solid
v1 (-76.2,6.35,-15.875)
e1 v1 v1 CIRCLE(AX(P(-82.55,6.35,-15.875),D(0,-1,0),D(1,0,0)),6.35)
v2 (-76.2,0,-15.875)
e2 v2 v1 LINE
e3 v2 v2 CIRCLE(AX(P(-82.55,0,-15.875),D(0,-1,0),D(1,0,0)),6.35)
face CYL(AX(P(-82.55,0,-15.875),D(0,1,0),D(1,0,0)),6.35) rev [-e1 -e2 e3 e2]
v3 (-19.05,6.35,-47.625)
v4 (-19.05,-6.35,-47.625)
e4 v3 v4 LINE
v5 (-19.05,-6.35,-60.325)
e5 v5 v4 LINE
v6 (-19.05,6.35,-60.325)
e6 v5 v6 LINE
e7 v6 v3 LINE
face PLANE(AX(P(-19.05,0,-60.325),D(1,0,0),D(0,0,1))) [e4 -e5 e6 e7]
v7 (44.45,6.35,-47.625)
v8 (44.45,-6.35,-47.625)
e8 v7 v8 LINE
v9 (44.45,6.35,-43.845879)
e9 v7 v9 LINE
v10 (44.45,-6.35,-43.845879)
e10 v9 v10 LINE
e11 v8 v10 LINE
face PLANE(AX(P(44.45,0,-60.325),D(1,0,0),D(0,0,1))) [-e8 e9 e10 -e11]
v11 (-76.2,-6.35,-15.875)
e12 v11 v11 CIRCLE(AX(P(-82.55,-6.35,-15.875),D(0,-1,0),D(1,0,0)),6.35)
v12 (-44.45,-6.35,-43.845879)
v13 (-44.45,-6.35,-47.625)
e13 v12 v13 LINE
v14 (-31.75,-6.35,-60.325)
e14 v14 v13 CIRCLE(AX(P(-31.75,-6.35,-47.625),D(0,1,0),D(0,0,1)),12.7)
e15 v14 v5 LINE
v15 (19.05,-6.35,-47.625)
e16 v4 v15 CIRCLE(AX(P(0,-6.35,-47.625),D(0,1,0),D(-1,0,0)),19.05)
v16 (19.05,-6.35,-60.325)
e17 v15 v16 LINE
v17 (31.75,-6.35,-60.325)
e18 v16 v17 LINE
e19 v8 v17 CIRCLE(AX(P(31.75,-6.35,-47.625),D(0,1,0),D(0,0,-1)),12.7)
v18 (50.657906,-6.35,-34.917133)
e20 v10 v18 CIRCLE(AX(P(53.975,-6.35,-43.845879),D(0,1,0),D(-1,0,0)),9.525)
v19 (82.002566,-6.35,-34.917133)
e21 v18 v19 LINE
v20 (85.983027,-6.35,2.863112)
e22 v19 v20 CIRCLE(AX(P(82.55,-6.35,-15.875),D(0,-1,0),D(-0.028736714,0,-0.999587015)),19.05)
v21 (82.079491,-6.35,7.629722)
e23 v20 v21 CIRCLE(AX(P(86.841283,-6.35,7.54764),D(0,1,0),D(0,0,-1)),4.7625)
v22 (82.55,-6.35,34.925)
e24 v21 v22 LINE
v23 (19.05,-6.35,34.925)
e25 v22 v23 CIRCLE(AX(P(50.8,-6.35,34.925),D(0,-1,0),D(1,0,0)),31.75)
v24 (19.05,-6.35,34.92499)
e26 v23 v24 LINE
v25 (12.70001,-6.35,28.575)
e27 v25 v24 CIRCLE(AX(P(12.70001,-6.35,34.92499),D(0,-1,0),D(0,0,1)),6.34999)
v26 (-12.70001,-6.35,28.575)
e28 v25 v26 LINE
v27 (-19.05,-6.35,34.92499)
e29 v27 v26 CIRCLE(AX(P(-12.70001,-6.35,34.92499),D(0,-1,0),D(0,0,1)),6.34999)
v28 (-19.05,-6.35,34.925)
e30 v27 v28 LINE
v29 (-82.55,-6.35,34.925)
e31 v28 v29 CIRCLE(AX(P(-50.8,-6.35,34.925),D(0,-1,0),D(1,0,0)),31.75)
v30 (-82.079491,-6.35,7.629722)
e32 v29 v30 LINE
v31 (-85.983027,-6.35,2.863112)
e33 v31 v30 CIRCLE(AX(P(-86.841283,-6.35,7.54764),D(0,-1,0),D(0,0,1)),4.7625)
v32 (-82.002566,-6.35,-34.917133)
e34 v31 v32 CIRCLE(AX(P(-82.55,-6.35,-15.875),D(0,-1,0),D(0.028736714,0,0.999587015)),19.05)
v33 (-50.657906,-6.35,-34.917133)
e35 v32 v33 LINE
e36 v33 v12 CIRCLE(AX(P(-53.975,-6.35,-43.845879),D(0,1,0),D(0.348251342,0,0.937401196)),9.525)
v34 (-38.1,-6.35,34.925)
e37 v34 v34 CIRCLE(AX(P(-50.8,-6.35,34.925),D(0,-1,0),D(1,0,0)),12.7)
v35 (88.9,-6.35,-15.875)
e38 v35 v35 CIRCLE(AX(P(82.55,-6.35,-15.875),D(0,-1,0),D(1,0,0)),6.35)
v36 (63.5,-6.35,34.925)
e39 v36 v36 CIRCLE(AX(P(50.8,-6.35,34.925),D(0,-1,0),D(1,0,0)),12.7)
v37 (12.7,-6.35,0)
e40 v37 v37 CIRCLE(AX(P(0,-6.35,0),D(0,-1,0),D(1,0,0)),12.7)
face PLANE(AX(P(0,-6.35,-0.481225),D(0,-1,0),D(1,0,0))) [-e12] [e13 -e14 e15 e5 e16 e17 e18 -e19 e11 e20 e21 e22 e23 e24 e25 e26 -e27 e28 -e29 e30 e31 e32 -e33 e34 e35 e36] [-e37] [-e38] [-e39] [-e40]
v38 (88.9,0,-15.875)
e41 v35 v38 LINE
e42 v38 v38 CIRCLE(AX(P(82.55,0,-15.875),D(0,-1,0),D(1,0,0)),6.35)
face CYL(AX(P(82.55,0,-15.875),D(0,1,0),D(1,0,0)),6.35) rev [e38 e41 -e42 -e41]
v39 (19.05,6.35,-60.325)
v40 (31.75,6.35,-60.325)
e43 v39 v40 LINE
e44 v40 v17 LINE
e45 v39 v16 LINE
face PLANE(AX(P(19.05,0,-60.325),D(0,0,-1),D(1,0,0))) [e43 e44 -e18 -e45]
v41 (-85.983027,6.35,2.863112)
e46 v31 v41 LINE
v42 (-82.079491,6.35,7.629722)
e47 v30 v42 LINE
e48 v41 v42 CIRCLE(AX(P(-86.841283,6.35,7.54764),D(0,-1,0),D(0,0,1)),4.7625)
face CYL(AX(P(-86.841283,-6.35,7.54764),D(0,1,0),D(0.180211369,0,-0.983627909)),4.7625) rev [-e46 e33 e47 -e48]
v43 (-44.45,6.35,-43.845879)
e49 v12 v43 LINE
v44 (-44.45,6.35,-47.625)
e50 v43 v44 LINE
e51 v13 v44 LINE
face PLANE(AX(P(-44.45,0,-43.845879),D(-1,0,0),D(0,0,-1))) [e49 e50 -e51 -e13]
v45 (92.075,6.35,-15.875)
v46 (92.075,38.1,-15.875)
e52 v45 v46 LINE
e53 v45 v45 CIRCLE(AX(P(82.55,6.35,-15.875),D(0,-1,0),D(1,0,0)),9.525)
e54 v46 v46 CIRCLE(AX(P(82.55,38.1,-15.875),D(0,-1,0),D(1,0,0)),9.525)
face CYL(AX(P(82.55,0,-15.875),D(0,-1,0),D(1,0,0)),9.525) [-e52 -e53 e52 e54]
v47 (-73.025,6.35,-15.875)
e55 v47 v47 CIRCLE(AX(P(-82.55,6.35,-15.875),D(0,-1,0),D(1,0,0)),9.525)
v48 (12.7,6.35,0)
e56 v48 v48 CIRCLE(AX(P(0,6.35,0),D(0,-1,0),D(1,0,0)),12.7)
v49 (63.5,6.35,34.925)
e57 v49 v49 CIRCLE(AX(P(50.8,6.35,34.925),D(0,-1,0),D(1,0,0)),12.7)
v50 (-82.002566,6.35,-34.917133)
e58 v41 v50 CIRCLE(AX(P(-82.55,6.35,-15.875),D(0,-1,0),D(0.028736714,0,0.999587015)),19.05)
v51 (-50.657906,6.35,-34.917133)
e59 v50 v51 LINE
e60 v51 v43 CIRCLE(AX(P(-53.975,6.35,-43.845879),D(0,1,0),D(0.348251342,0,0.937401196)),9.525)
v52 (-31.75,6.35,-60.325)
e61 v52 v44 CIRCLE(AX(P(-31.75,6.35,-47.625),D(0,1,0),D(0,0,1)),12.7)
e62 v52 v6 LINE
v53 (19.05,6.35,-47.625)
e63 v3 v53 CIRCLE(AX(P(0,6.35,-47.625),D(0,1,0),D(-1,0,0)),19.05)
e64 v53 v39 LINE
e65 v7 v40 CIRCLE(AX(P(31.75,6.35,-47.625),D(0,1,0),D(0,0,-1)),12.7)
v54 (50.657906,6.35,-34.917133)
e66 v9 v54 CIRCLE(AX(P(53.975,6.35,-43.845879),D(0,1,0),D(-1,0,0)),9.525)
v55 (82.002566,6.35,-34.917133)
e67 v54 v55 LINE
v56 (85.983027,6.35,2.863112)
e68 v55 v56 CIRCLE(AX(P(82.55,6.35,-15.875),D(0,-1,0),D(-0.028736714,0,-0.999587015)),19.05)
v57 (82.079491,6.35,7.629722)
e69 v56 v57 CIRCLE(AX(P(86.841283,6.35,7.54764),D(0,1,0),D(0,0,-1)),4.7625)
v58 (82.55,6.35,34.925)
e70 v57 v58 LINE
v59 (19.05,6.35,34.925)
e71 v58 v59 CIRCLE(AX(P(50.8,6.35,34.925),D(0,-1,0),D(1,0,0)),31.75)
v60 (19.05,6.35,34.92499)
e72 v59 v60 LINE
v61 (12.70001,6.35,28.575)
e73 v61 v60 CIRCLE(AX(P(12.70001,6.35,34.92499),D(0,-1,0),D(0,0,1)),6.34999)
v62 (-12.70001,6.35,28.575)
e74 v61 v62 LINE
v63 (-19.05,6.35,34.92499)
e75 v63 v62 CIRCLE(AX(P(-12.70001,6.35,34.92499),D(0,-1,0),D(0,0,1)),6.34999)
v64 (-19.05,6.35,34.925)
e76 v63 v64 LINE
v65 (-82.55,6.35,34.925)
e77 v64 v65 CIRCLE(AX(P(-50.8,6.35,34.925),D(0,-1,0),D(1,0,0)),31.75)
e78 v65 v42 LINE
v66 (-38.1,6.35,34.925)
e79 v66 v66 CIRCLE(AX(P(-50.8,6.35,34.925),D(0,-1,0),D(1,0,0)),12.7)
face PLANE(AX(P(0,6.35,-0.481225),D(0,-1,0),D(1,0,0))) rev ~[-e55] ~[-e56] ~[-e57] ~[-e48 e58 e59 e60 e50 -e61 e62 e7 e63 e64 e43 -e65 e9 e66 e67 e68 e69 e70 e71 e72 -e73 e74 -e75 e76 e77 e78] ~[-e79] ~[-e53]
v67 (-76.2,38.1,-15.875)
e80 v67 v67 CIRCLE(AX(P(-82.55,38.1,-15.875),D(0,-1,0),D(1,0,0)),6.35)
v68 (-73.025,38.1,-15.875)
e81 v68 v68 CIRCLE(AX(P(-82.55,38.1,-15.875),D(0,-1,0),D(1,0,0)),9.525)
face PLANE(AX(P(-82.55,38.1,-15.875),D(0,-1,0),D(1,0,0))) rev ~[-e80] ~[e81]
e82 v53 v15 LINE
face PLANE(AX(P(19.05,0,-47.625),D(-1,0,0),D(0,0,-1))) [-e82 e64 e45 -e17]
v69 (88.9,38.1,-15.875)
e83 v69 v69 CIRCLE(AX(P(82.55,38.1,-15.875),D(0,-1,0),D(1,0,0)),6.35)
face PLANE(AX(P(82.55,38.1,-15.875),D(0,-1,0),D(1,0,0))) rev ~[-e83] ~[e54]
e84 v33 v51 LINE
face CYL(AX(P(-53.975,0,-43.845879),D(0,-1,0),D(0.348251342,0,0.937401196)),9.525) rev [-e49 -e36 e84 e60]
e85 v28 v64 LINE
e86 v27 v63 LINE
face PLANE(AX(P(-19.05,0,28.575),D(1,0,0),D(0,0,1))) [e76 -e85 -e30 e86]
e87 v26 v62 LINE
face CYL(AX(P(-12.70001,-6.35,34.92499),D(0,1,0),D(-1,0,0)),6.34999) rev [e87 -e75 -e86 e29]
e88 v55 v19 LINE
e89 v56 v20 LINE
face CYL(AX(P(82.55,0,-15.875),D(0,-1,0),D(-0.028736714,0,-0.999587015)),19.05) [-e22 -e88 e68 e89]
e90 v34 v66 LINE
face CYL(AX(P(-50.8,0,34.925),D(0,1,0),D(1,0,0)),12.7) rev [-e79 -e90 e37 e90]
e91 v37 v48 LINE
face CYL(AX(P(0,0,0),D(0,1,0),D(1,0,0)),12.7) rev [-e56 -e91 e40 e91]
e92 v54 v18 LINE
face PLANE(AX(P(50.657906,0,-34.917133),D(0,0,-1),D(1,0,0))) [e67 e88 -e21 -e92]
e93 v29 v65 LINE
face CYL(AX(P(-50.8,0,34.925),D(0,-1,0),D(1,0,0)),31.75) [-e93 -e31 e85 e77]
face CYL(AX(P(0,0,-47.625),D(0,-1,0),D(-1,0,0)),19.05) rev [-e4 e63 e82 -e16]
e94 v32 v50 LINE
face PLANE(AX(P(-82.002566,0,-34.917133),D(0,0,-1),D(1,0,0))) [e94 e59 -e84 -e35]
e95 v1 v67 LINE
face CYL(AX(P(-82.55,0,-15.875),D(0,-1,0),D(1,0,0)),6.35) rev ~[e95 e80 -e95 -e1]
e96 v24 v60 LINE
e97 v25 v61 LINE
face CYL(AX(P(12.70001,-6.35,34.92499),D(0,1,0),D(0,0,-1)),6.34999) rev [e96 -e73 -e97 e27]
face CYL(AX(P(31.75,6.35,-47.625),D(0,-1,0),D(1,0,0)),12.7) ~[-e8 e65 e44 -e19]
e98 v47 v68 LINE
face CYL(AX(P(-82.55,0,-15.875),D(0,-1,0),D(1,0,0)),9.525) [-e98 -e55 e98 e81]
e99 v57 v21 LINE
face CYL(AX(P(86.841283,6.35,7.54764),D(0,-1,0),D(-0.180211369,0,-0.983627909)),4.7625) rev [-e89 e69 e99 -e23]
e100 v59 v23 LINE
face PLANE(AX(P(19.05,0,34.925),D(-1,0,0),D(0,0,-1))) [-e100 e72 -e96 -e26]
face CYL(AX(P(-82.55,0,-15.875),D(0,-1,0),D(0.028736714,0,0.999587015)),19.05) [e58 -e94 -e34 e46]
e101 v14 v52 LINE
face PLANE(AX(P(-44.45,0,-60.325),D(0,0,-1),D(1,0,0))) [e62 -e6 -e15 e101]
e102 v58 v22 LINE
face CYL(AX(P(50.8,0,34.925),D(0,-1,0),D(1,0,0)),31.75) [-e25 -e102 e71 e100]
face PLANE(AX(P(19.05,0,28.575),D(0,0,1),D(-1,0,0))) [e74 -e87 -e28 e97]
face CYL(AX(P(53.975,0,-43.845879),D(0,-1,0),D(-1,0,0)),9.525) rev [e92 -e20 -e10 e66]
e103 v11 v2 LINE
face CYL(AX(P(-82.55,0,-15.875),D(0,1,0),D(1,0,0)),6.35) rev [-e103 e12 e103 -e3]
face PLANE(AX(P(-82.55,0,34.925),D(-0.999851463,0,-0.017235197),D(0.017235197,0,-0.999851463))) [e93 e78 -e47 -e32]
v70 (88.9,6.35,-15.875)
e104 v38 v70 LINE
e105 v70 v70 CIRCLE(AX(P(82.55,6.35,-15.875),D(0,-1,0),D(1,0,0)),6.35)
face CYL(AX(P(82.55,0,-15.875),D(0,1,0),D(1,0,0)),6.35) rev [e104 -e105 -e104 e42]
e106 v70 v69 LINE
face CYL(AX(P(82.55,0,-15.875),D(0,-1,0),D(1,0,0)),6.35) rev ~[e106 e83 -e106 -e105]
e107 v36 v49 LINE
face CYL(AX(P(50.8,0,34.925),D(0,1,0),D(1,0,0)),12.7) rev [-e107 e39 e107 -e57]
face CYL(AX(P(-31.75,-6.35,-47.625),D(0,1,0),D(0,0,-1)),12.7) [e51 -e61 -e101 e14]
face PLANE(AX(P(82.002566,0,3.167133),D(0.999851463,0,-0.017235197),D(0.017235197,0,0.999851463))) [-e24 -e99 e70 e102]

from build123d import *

# Parameters (mm, degrees)
F0_R     = 9.525
F0_R_2   = 12.7
F0_R_3   = 6.35
F1_DEPTH = 6.35
F2_R     = 12.7
F3_R     = 4.7625
F4_R     = 6.34999
F5_DEPTH = 38.1


# Not quite as in the source:
# - a fillet or chamfer is up to 0.001 mm smaller than in the source, because OpenCascade refuses the exact size


with BuildPart() as f1:
    # F0 (on Front) → F1 (new body, symmetric)
    with BuildSketch(Plane.XZ):
        with BuildLine():
            Line((-19.05, -60.325), (-19.05, -47.625))
            ThreePointArc((-19.05, -47.625), (0, -28.575), (19.05, -47.625))
            Line((19.05, -47.625), (19.05, -60.325))
            Line((19.05, -60.325), (44.45, -60.325))
            Line((44.45, -60.325), (44.45, -43.8458790377))
            ThreePointArc((44.45, -43.8458790377), (46.1544838519, -38.4084943559), (50.6579059691, -34.9171326425))
            Line((50.6579059691, -34.9171326425), (82.0025655956, -34.9171326425))
            ThreePointArc((82.0025655956, -34.9171326425), (101.6, -15.875), (82.0025655956, 3.1671326425))
            Line((82.0025655956, 3.1671326425), (82.55, 34.925))
            ThreePointArc((82.55, 34.925), (50.8, 66.675), (19.05, 34.925))
            Line((19.05, 34.925), (19.05, 28.575))
            Line((19.05, 28.575), (-19.05, 28.575))
            Line((-19.05, 28.575), (-19.05, 34.925))
            ThreePointArc((-19.05, 34.925), (-50.8, 66.675), (-82.55, 34.925))
            Line((-82.55, 34.925), (-82.0025655956, 3.1671326425))
            ThreePointArc((-82.0025655956, 3.1671326425), (-101.6, -15.875), (-82.0025655956, -34.9171326425))
            Line((-82.0025655956, -34.9171326425), (-50.6579059691, -34.9171326425))
            ThreePointArc((-50.6579059691, -34.9171326425), (-46.1544838519, -38.4084943559), (-44.45, -43.8458790377))
            Line((-44.45, -43.8458790377), (-44.45, -60.325))
            Line((-44.45, -60.325), (-19.05, -60.325))
        make_face()
        with Locations((-82.55, -15.875)):
            Circle(F0_R, mode=Mode.SUBTRACT)
        Circle(F0_R_2, mode=Mode.SUBTRACT)
        with Locations((82.55, -15.875)):
            Circle(F0_R, mode=Mode.SUBTRACT)
        with Locations((-50.8, 34.925)):
            Circle(F0_R_2, mode=Mode.SUBTRACT)
        with Locations((50.8, 34.925)):
            Circle(F0_R_2, mode=Mode.SUBTRACT)
        with Locations((-82.55, -15.875)):
            Circle(F0_R)
        with Locations((-82.55, -15.875)):
            Circle(F0_R_3, mode=Mode.SUBTRACT)
        with Locations((82.55, -15.875)):
            Circle(F0_R)
        with Locations((82.55, -15.875)):
            Circle(F0_R_3, mode=Mode.SUBTRACT)
    extrude(amount=F1_DEPTH, both=True)

    # F2
    f2_edges = [f1.edges().sort_by_distance(p)[0] for p in [
        (-44.45, 0, -60.325),
        (44.45, 0, -60.325),
    ]]
    fillet(f2_edges, radius=F2_R)

    # F3
    f3_edges = [f1.edges().sort_by_distance(p)[0] for p in [
        (-82.002566, 0, 3.167133),
        (82.002566, 0, 3.167133),
    ]]
    fillet(f3_edges, radius=F3_R)

    # F4 (radius 6.35 in the source; OpenCascade refuses exactly that, so slightly less here)
    f4_edges = [f1.edges().sort_by_distance(p)[0] for p in [
        (-19.05, 0, 28.575),
        (19.05, 0, 28.575),
    ]]
    fillet(f4_edges, radius=F4_R)

    # F0 (on Front) → F5 (join)
    with BuildSketch(Plane.XZ):
        with Locations((-82.55, -15.875)):
            Circle(F0_R)
        with Locations((-82.55, -15.875)):
            Circle(F0_R_3, mode=Mode.SUBTRACT)
        with Locations((82.55, -15.875)):
            Circle(F0_R)
        with Locations((82.55, -15.875)):
            Circle(F0_R_3, mode=Mode.SUBTRACT)
    extrude(amount=-F5_DEPTH)


solid = f1.part
